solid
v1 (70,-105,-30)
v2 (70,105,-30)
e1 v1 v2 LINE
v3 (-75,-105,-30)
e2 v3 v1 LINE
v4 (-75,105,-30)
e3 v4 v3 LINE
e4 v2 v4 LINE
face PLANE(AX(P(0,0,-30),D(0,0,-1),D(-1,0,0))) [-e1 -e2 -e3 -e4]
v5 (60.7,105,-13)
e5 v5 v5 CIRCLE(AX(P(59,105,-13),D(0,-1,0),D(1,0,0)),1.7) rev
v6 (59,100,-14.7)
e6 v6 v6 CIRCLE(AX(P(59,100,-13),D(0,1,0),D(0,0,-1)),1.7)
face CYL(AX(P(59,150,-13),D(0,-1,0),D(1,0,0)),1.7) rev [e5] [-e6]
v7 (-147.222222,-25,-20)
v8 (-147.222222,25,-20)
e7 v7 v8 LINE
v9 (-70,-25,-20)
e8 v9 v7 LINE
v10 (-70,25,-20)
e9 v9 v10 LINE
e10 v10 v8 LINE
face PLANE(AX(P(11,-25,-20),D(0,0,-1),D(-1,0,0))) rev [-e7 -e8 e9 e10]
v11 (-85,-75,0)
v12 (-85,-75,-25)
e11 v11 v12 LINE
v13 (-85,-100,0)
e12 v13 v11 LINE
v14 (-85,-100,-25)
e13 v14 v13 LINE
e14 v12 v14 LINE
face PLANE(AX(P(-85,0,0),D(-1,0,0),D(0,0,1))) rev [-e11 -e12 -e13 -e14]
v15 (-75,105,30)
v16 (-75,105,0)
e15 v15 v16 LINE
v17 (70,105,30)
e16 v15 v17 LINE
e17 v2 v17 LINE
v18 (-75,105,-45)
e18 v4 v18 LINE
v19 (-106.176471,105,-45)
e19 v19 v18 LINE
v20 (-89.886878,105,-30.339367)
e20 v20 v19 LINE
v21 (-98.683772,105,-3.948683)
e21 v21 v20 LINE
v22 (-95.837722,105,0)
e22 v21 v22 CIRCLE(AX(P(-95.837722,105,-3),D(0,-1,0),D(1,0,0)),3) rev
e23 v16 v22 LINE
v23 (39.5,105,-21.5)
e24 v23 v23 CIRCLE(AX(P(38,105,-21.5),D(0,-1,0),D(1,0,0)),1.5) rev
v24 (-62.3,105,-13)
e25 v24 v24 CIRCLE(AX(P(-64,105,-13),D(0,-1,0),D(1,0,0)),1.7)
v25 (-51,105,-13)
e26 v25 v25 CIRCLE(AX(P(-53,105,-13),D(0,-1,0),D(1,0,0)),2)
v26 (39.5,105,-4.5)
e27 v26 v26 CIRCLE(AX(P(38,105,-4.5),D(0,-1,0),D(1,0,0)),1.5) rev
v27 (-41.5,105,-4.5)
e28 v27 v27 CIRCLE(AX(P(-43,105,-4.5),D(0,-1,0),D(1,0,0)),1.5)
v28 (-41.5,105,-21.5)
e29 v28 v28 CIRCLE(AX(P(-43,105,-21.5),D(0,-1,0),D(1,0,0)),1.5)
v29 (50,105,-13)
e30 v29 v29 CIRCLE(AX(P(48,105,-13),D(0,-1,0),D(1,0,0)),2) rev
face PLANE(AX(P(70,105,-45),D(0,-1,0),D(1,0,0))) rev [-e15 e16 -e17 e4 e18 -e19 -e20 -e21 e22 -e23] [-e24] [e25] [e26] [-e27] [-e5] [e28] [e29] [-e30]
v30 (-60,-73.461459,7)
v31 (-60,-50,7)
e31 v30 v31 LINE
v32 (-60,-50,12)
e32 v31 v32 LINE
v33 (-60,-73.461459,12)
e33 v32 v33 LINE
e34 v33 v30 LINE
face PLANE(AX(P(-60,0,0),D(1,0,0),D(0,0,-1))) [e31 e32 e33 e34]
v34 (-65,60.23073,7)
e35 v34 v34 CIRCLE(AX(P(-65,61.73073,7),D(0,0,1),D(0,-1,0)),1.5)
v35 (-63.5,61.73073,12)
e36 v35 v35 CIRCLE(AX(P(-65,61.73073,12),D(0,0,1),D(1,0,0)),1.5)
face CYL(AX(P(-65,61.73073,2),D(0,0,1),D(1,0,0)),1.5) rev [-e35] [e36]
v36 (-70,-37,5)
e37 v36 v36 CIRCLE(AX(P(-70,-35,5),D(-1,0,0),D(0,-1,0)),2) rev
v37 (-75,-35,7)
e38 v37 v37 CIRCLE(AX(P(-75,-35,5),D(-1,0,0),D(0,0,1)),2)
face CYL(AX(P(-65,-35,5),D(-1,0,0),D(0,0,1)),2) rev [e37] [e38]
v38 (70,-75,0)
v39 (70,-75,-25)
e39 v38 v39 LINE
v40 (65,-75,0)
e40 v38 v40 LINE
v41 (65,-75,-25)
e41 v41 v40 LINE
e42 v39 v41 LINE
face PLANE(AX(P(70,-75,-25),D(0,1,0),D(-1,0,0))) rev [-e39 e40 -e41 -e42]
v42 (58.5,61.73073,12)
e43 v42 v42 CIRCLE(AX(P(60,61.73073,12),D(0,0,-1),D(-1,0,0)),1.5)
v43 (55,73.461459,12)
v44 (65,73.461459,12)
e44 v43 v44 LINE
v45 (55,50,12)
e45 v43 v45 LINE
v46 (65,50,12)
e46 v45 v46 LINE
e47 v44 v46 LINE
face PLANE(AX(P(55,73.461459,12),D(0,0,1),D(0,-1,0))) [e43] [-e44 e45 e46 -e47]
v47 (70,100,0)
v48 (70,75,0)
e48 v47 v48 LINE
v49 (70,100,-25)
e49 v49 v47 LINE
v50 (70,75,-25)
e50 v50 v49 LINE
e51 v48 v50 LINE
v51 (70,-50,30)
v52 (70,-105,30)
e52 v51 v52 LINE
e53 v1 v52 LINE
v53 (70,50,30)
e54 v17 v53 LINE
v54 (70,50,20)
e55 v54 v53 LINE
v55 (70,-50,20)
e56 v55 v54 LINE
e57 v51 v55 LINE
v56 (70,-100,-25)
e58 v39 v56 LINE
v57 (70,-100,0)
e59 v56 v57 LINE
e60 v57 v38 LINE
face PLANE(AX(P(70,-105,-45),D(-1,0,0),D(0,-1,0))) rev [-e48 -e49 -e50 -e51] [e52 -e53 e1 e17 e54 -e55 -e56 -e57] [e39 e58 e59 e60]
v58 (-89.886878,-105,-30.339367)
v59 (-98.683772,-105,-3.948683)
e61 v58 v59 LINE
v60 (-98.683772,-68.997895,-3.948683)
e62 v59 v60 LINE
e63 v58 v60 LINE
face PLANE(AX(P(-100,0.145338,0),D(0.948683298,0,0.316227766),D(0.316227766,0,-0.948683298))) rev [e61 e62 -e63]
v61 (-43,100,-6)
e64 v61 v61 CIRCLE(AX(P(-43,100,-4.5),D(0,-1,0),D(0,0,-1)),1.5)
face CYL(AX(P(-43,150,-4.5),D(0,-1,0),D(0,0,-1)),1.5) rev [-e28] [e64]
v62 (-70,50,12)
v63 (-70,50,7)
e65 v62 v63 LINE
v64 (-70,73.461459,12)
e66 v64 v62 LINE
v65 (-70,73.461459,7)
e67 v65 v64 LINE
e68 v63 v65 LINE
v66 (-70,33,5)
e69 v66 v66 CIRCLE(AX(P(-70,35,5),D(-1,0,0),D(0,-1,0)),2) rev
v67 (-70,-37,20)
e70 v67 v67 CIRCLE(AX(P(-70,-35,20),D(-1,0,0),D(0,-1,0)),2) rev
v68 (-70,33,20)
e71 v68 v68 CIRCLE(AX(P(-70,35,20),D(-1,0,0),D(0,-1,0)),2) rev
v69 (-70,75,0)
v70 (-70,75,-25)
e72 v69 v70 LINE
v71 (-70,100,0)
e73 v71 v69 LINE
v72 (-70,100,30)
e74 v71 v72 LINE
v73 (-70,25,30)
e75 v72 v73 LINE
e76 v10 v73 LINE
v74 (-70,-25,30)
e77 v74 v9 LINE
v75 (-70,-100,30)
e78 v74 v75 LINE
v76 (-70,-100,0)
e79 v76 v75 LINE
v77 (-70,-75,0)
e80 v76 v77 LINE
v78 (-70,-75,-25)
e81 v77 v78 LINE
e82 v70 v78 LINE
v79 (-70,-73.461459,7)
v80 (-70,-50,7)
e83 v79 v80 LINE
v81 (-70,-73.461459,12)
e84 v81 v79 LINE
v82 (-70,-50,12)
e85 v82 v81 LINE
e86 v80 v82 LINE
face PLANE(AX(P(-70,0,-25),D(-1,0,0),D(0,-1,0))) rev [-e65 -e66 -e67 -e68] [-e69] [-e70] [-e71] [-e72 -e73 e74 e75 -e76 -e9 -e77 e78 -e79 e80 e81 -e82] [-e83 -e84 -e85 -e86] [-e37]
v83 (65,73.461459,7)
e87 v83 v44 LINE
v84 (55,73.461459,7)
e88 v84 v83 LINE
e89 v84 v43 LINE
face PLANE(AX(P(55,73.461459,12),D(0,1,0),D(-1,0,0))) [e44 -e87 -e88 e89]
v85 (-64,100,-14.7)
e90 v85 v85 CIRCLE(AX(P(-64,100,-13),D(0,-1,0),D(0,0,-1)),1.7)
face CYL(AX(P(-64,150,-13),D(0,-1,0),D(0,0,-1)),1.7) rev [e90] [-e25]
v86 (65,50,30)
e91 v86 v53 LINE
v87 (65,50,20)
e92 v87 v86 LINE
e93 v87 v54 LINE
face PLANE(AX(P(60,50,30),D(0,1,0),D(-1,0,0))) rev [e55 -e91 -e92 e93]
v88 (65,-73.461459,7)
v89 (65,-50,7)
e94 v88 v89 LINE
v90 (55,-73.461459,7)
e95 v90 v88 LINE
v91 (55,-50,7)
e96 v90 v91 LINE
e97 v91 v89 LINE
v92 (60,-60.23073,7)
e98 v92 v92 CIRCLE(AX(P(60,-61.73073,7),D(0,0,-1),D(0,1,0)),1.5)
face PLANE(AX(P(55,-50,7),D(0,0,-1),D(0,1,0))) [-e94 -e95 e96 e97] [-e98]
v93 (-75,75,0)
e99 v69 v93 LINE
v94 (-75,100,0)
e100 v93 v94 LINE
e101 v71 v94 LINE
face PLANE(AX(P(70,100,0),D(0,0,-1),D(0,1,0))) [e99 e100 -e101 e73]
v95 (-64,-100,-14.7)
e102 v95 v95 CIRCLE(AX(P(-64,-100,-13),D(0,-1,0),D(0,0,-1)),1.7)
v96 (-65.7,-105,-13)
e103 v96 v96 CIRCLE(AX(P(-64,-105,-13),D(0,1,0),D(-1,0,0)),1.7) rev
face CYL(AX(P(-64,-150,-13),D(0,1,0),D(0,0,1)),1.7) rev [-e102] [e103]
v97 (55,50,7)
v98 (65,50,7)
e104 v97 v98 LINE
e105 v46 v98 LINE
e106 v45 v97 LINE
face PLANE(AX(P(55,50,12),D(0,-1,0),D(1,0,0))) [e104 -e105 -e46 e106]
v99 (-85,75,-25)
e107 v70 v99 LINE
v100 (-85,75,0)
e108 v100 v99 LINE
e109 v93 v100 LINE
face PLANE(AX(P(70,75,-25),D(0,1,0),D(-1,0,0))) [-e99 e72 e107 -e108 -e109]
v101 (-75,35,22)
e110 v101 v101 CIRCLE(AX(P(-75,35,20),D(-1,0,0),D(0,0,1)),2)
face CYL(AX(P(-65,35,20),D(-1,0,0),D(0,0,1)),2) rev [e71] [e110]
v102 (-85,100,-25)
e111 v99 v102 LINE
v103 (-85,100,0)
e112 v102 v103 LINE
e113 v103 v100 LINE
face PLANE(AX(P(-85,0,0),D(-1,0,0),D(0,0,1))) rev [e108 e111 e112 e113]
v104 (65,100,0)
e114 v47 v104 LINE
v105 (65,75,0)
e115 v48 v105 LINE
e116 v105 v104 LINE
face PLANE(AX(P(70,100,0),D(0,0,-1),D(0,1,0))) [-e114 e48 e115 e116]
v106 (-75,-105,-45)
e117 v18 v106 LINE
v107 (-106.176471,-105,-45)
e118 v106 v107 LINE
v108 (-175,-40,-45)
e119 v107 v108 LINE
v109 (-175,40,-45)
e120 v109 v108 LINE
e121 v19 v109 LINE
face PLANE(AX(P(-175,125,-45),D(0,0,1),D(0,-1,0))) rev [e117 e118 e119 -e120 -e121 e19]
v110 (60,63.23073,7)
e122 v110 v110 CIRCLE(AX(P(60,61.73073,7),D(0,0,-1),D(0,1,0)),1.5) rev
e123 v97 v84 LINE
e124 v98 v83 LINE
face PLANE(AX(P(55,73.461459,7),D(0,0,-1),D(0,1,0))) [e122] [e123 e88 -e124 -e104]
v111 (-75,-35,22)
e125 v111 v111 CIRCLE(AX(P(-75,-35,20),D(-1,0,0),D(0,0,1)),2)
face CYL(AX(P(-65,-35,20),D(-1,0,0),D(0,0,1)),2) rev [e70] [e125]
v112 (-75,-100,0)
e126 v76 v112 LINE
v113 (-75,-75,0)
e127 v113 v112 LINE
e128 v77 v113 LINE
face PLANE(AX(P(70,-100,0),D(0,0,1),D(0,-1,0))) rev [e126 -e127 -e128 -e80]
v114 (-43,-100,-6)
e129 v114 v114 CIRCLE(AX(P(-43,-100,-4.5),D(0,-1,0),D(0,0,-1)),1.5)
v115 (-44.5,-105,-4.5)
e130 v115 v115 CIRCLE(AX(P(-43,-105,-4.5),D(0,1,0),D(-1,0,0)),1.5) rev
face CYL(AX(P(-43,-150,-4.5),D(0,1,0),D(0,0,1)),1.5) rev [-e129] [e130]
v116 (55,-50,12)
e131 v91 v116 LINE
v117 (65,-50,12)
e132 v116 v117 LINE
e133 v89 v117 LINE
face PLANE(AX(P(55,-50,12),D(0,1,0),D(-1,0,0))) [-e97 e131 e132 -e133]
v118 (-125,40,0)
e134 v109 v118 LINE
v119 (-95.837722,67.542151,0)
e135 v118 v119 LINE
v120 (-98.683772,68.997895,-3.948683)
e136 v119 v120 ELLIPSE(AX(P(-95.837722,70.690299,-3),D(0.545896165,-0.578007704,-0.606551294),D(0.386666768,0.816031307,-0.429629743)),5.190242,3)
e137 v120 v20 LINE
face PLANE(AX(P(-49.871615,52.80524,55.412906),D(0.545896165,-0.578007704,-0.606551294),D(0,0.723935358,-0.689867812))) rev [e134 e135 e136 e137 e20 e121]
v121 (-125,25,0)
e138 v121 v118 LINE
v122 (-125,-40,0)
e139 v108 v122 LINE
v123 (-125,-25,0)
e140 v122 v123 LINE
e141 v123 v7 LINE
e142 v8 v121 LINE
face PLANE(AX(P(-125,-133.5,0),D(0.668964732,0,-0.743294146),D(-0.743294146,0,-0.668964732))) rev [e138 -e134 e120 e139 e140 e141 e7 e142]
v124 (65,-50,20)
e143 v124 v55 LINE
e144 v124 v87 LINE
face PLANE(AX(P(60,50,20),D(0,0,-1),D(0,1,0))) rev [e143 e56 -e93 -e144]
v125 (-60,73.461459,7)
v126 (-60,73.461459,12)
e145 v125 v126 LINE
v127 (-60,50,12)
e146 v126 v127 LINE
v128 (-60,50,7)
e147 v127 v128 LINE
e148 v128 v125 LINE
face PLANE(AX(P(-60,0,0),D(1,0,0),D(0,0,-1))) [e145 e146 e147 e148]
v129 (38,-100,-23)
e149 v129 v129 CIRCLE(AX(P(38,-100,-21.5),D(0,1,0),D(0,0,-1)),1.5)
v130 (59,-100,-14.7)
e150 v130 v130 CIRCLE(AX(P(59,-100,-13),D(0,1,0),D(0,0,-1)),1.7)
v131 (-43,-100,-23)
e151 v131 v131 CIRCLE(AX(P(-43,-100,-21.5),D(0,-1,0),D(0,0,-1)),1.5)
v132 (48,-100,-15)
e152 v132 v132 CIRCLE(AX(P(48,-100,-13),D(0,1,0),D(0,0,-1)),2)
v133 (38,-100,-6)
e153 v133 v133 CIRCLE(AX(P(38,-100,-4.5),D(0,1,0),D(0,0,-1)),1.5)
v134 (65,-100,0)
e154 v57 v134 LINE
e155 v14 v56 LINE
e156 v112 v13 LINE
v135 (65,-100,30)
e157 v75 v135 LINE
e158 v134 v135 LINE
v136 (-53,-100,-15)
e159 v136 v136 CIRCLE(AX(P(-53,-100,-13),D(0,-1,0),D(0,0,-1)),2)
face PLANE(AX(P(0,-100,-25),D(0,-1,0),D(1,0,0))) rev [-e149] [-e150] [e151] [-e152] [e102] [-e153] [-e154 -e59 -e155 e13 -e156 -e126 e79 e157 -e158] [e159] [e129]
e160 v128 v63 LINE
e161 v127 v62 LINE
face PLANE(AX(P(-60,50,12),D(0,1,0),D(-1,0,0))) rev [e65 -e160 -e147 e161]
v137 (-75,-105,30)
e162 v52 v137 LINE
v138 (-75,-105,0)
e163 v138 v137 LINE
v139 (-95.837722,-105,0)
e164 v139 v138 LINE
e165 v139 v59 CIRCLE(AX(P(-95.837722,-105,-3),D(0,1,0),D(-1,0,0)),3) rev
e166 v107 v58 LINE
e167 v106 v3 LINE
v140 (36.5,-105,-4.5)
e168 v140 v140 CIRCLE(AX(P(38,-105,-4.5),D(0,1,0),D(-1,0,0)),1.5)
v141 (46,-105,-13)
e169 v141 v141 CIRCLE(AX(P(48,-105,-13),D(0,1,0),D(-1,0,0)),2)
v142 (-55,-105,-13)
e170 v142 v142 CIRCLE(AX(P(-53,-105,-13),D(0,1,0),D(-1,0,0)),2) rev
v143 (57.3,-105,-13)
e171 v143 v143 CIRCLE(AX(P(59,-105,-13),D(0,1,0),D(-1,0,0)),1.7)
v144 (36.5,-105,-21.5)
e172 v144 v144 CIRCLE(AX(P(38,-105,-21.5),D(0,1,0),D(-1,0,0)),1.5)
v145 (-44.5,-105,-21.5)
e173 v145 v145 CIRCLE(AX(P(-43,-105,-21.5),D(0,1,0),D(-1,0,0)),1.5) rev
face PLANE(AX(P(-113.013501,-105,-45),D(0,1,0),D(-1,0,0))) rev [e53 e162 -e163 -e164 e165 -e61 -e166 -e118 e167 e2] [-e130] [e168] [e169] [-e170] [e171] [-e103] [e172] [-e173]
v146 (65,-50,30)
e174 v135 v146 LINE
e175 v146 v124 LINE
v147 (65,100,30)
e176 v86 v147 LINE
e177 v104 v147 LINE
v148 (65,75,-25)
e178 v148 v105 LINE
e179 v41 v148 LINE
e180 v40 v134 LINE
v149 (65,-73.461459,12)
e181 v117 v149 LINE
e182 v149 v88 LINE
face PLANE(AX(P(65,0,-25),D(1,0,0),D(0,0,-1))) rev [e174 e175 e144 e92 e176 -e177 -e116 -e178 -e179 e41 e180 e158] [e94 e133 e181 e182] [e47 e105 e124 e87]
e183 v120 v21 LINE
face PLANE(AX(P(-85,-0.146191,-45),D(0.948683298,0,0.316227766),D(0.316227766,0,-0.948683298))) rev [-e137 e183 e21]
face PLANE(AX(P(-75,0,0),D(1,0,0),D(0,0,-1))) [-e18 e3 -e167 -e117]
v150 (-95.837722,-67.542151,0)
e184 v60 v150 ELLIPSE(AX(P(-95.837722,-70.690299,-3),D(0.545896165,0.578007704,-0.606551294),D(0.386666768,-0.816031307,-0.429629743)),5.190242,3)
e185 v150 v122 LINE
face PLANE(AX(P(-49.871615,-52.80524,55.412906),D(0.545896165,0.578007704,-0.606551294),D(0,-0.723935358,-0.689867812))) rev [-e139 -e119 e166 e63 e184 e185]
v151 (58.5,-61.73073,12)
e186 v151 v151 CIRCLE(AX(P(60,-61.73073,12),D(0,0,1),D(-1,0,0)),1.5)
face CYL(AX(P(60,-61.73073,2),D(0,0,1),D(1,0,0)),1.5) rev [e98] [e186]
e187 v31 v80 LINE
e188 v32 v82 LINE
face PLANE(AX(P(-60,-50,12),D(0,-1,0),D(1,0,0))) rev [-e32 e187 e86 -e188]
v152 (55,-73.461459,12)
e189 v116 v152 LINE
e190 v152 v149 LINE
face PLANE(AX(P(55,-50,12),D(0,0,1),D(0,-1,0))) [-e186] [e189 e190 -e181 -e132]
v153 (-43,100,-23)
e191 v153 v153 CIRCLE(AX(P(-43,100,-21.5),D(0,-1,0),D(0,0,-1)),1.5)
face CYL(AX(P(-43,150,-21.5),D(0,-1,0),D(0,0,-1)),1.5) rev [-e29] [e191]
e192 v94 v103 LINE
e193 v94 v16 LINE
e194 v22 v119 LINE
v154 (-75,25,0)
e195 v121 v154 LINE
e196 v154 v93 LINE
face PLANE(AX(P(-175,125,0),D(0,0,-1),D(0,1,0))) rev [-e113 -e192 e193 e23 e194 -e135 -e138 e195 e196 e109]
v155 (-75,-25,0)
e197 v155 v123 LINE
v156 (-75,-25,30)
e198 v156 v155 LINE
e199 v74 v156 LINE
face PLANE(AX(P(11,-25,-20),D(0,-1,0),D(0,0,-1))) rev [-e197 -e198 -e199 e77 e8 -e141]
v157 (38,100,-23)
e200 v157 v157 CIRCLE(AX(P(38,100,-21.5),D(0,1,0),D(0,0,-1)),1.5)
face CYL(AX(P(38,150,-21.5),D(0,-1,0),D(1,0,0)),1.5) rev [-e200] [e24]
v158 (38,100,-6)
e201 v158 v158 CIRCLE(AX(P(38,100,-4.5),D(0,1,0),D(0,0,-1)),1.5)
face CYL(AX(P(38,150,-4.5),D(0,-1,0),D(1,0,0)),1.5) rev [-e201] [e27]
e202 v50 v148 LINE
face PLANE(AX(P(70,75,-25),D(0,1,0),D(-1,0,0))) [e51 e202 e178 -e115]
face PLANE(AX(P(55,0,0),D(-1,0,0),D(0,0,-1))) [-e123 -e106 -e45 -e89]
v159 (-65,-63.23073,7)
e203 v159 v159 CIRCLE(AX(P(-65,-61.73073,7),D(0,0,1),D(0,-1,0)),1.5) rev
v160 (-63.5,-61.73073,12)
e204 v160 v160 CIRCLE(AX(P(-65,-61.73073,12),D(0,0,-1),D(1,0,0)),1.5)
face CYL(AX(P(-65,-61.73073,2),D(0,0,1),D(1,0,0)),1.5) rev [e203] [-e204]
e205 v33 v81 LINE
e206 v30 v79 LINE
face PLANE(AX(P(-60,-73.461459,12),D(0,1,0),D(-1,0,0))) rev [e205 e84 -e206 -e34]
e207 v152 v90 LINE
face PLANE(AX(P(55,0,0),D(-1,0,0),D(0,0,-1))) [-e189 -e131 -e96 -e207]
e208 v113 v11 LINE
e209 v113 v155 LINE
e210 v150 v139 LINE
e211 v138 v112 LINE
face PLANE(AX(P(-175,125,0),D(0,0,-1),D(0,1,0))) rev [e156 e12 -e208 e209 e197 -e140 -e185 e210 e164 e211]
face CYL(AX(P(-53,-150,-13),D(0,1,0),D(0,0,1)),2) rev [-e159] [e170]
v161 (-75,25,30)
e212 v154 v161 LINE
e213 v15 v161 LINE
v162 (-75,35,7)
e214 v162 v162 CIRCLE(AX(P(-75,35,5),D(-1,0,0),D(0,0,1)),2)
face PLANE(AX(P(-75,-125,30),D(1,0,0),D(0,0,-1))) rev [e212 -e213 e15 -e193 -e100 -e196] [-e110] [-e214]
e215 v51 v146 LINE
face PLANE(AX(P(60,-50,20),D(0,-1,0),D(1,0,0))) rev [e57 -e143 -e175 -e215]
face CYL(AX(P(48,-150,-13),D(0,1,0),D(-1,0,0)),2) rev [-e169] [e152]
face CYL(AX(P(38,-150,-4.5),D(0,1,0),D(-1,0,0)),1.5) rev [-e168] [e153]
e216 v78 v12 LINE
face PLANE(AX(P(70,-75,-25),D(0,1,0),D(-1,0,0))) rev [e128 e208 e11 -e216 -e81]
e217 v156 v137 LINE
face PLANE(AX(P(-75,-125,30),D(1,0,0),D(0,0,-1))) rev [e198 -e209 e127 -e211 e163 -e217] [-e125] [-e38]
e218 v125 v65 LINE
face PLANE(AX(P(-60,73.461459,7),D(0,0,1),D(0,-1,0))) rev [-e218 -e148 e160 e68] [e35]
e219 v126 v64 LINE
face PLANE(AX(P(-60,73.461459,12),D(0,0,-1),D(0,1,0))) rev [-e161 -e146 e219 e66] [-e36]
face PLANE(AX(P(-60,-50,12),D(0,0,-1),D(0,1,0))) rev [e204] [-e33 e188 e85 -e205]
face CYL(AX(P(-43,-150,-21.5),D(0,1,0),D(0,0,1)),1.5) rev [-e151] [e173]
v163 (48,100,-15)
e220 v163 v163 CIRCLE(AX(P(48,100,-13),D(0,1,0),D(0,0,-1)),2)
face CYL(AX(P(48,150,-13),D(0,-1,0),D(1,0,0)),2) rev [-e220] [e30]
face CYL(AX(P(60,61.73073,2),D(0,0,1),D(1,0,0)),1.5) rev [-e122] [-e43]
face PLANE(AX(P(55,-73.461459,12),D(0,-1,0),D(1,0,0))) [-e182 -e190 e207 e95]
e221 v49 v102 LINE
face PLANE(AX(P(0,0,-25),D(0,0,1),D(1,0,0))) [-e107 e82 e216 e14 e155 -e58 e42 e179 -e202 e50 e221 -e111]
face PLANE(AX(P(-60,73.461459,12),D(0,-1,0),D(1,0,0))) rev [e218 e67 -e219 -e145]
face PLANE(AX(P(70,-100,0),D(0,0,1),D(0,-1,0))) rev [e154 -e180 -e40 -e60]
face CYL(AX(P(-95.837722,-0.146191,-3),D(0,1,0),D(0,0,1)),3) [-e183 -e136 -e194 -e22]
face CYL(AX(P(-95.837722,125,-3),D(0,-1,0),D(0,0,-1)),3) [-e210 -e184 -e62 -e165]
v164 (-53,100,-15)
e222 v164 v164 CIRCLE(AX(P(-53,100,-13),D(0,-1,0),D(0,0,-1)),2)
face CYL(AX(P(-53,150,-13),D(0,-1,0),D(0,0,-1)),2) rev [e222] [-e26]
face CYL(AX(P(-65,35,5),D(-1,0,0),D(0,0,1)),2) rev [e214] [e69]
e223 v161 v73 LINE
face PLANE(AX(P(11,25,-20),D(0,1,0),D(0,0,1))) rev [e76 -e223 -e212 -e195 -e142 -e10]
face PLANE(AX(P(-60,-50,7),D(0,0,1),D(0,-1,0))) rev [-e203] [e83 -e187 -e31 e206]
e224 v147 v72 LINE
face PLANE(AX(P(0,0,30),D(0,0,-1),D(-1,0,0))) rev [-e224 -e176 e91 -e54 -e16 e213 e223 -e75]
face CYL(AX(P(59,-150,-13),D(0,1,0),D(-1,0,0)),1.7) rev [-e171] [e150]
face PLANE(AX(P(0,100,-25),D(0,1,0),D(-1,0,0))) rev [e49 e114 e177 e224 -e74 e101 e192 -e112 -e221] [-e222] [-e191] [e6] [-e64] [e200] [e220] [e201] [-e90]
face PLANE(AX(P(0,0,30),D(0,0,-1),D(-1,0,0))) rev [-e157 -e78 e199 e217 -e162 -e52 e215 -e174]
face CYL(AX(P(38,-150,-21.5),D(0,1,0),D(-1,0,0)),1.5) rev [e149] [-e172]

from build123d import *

# Parameters (mm, degrees)
SKETCH1_W                 = 150
SKETCH1_H                 = 250
BOSS_EXTRUDE1_DEPTH       = 30
SKETCH6_W                 = 45
SKETCH6_H                 = 250
BOSS_EXTRUDE3_DEPTH       = 100
CUT_EXTRUDE7_DEPTH        = 133.5
CUT_EXTRUDE10_DEPTH       = 267
CUT_EXTRUDE11_START       = -50
CUT_EXTRUDE11_DEPTH       = 50
CUT_EXTRUDE16_START       = 7.483352464
CUT_EXTRUDE16_DEPTH       = 123.332093593
CUT_EXTRUDE17_REACH       = 310.464
SKETCH18_R                = 2
CUT_EXTRUDE18_DEPTH       = 10
CUT_EXTRUDE19_START       = 110
SKETCH17_W                = 110
SKETCH17_H                = 50
CUT_EXTRUDE19_DEPTH       = 196
FILLET3_R                 = 3
FILLET5_R                 = 3
CUT_EXTRUDE20_DEPTH       = 228.760839479
SKETCH20_W                = 135
SKETCH20_H                = 200
CUT_EXTRUDE21_DEPTH       = 55
SKETCH22_R                = 1.7
SKETCH22_R_2              = 2
SKETCH22_R_3              = 1.5
CUT_EXTRUDE22_DEPTH       = 50
MIRROR4_COPY_1_SKETCH_R   = 1.7
MIRROR4_COPY_1_SKETCH_R_2 = 2
MIRROR4_COPY_1_SKETCH_R_3 = 1.5
MIRROR4_COPY_1_DEPTH      = 50
CUT_EXTRUDE23_START       = -15
SKETCH23_W                = 25
SKETCH23_H                = 25
CUT_EXTRUDE23_DEPTH       = 196.693109996
SKETCH24_W                = 10
SKETCH24_H                = 100
CUT_EXTRUDE24_DEPTH       = 10
SKETCH26_W                = 5
SKETCH26_H                = 23.461459367
BOSS_EXTRUDE4_DEPTH       = 10
SKETCH28_R                = 1.5
CUT_EXTRUDE25_DEPTH       = 10
MIRROR8_COPY_1_SKETCH_R   = 1.5
MIRROR8_COPY_1_DEPTH      = 10


with BuildPart() as part:
    # Sketch1 → Boss-Extrude1 (new, symmetric)
    with BuildSketch(Plane.XY):
        Rectangle(SKETCH1_W, SKETCH1_H)
    extrude(amount=BOSS_EXTRUDE1_DEPTH, both=True)

    # Sketch6 → Boss-Extrude3 (add)
    with BuildSketch(Plane.ZY.offset(75)):
        with Locations((-22.5, 0)):
            Rectangle(SKETCH6_W, SKETCH6_H)
    extrude(amount=BOSS_EXTRUDE3_DEPTH)

    # Sketch9 → Cut-Extrude7 (cut, symmetric)
    with BuildSketch(Plane(origin=(0, 0, 0), x_dir=(1, 0, 0), z_dir=(0, 1, 0))):
        Polygon((-125, 0), (-175, 45), (-175, 0), align=None)
    extrude(amount=CUT_EXTRUDE7_DEPTH, both=True, mode=Mode.SUBTRACT)

    # Sketch13 → Cut-Extrude10 (cut)
    with BuildSketch(Plane(origin=(-49.871615343, 52.805239774, 55.412905936), x_dir=(-0.837852837655121, -0.3765961924075118, -0.3951935352424505), z_dir=(0.5458961645159833, -0.578007703605159, -0.6065512939066482))):
        Polygon((138.497571597, 161.006204915), (149.344107979, 60.001465841), (41.926676236, 121.535971264), align=None)
    cut_extrude10 = extrude(amount=-CUT_EXTRUDE10_DEPTH, mode=Mode.SUBTRACT)

    # Cut-Extrude11: read off the stored shape, not the designer's step
    # Cut-Extrude11 outline → Cut-Extrude11 (cut)
    with BuildSketch(Plane(origin=(-49.871615343, 52.805239774, 55.412905936), x_dir=(-0.837852837655121, -0.3765961924075118, -0.3951935352424505), z_dir=(0.5458961645159833, -0.578007703605159, -0.6065512939066482)).offset(CUT_EXTRUDE11_START)):
        Polygon((149.344107979, 60.001465841), (41.926676236, 121.535971264), (89.667757011, 28.957414317), align=None)
    cut_extrude11 = extrude(amount=CUT_EXTRUDE11_DEPTH, mode=Mode.SUBTRACT)

    # Cut-Extrude16: read off the stored shape, not the designer's step
    # Cut-Extrude16 outline → Cut-Extrude16 (cut)
    with BuildSketch(Plane(origin=(0, 0, 0), x_dir=(0.98112989145127, -0.1559406555847297, 0.11430943984039024), z_dir=(0.19334977657297428, 0.7913018633819886, -0.5800493297189246)).offset(CUT_EXTRUDE16_START)):
        Polygon((-117.605571093, -73.90068007), (-108.032547514, -37.607234969), (-131.340301245, -22), (-144, -22), (-144, -75), (-117.895535729, -75), align=None)
    extrude(amount=CUT_EXTRUDE16_DEPTH, mode=Mode.SUBTRACT)

    # Mirror2: Cut-Extrude10, Cut-Extrude11 across plane
    add(cut_extrude10.mirror(Plane.ZX), mode=Mode.SUBTRACT)
    add(cut_extrude11.mirror(Plane.ZX), mode=Mode.SUBTRACT)

    # Cut-Extrude17: up to this face of the body (flat: up to its plane)
    cut_extrude17_end = Plane(part.part.faces().sort_by_distance((-128.333333334, -68.333333333, -30))[0])
    # Sketch15 → Cut-Extrude17 (cut, up to the picked face)
    with BuildSketch(Plane.XZ.offset(125), mode=Mode.PRIVATE) as cut_extrude17_sk1:
        Polygon((-125.332336707, 0), (-100, 0), (-85, -45), align=None)
    cut_extrude17_tool1 = split(extrude(cut_extrude17_sk1.sketch, amount=-CUT_EXTRUDE17_REACH, mode=Mode.PRIVATE), bisect_by=cut_extrude17_end, keep=Keep.BOTH, mode=Mode.PRIVATE)
    add(cut_extrude17_tool1.solids().sort_by(Axis((-103.444112, -125, -15), (0, 1, 0)))[0], mode=Mode.SUBTRACT)

    # Sketch18 → Cut-Extrude18 (cut)
    with BuildSketch(Plane.ZY.offset(75)):
        with Locations((5, -35)):
            Circle(SKETCH18_R)
        with Locations((20, -35)):
            Circle(SKETCH18_R)
        with Locations((5, 35)):
            Circle(SKETCH18_R)
        with Locations((20, 35)):
            Circle(SKETCH18_R)
    extrude(amount=-CUT_EXTRUDE18_DEPTH, mode=Mode.SUBTRACT)

    # Sketch17 → Cut-Extrude19 (cut)
    with BuildSketch(Plane.ZY.offset(75).offset(CUT_EXTRUDE19_START)):
        with Locations((35, 0)):
            Rectangle(SKETCH17_W, SKETCH17_H)
    extrude(amount=-CUT_EXTRUDE19_DEPTH, mode=Mode.SUBTRACT)

    # Fillet3
    # the kernel refuses this fillet: 3 mm, written as the material it takes off along each edge
    with BuildSketch(Plane(origin=(-95.83772234, -122, -3), x_dir=(-0.9486832980505141, 0, -0.3162277660168372), z_dir=(0, -1, 0))) as fillet3_piece_1_section:
        Polygon((0, 0), (FILLET3_R * 1.02, 0), (FILLET3_R * 1.02, -FILLET3_R * 1.41517440446), (-FILLET3_R * 0.322552321337, -FILLET3_R * 0.967656964012), align=None)
    fillet3_piece_1 = extrude(amount=FILLET3_R * 1.02, mode=Mode.PRIVATE)
    fillet3_piece_1 = fillet3_piece_1 - Plane(origin=(-95.83772234, -122, -3), x_dir=(0.8112421851755607, 0, -0.5847102846637652), z_dir=(0, -1, 0)) * Sphere(FILLET3_R, mode=Mode.PRIVATE)
    add(fillet3_piece_1, mode=Mode.SUBTRACT)
    with BuildSketch(Plane(origin=(-75, -125, 0), x_dir=(0, 0, -1), z_dir=(-1, 0, 0))) as fillet3_piece_2:
        with BuildLine():
            CenterArc((FILLET3_R, -FILLET3_R), FILLET3_R, 90, 90)
            Line((0, -FILLET3_R), (0, 0))
            Line((0, 0), (FILLET3_R, 0))
        make_face()
    extrude(amount=20.83772234, mode=Mode.SUBTRACT)
    with BuildSketch(Plane(origin=(-98.683772234, -125, -3.948683298), x_dir=(0.9486832980505141, 0, 0.3162277660168373), z_dir=(0.3162277660168372, 0, -0.9486832980505141))) as fillet3_piece_3_section:
        with BuildLine():
            CenterArc((FILLET3_R, -FILLET3_R), FILLET3_R, 90, 90)
            Line((0, -FILLET3_R), (0, 0))
            Line((0, 0), (FILLET3_R, 0))
        make_face()
    fillet3_piece_3 = extrude(amount=50.771887242, mode=Mode.PRIVATE)
    fillet3_piece_3 = split(fillet3_piece_3, bisect_by=Plane(origin=(-81.013305522, -106.290094069, -23.5825352), z_dir=(-0.5458961645159834, -0.5780077036051591, 0.6065512939066484)), keep=Keep.TOP, mode=Mode.PRIVATE)
    add(fillet3_piece_3, mode=Mode.SUBTRACT)
    with BuildSketch(Plane(origin=(-100, -122, 0), x_dir=(0.3162277660168381, 0, -0.9486832980505137), z_dir=(0, 1, 0))) as fillet3_piece_4_section:
        with BuildLine():
            CenterArc((FILLET3_R * 1.38742588672, -FILLET3_R), FILLET3_R, 90, 108.434948823)
            Line((FILLET3_R * 0.438742588672, -FILLET3_R * 1.31622776602), (0, 0))
            Line((0, 0), (FILLET3_R * 1.38742588672, 0))
        make_face()
    fillet3_piece_4 = extrude(amount=68.794583039, mode=Mode.PRIVATE)
    fillet3_piece_4 = split(fillet3_piece_4, bisect_by=Plane(origin=(-81.576426107, -102.492686466, -20.470637659), z_dir=(-0.5458961645159834, -0.5780077036051591, 0.6065512939066484)), keep=Keep.TOP, mode=Mode.PRIVATE)
    add(fillet3_piece_4, mode=Mode.SUBTRACT)

    # Fillet5
    # the kernel refuses this fillet: 3 mm, written as the material it takes off along each edge
    with BuildSketch(Plane(origin=(-95.83772234, 122, -3), x_dir=(-0.9486832980504565, -1.410260797030105e-13, -0.31622776601701025), z_dir=(0, 1, 0))) as fillet5_piece_1_section:
        Polygon((0, 0), (FILLET5_R * 1.02, 0), (FILLET5_R * 1.02, FILLET5_R * 1.41517440446), (-FILLET5_R * 0.322552321337, FILLET5_R * 0.967656964011), align=None)
    fillet5_piece_1 = extrude(amount=FILLET5_R * 1.02, mode=Mode.PRIVATE)
    fillet5_piece_1 = fillet5_piece_1 - Plane(origin=(-95.83772234, 122, -3), x_dir=(0.8112421851756141, 1.2049011170048047e-13, -0.5847102846636912), z_dir=(0, 1, 0)) * Sphere(FILLET5_R, mode=Mode.PRIVATE)
    add(fillet5_piece_1, mode=Mode.SUBTRACT)
    with BuildSketch(Plane(origin=(-75, 125, 0), x_dir=(0, 0, -1), z_dir=(-1, 0, 0))) as fillet5_piece_2:
        with BuildLine():
            CenterArc((FILLET5_R, FILLET5_R), FILLET5_R, 180, 90)
            Line((0, FILLET5_R), (0, 0))
            Line((0, 0), (FILLET5_R, 0))
        make_face()
    extrude(amount=20.83772234, mode=Mode.SUBTRACT)
    with BuildSketch(Plane(origin=(-82.628291755, 125, -52.115124735), x_dir=(0.9486832980504564, 0, 0.31622776601701025), z_dir=(-0.31622776601701025, 0, 0.9486832980504565))) as fillet5_piece_3_section:
        with BuildLine():
            CenterArc((FILLET5_R, -FILLET5_R), FILLET5_R, 90, 90)
            Line((0, -FILLET5_R), (0, 0))
            Line((0, 0), (FILLET5_R, 0))
        make_face()
    fillet5_piece_3 = extrude(amount=50.771887242, mode=Mode.PRIVATE)
    fillet5_piece_3 = split(fillet5_piece_3, bisect_by=Plane(origin=(-85.69098462, 128.24285127, -48.712132662), z_dir=(-0.5458961645131595, 0.5780077036058499, 0.6065512939085316)), keep=Keep.TOP, mode=Mode.PRIVATE)
    add(fillet5_piece_3, mode=Mode.SUBTRACT)
    with BuildSketch(Plane(origin=(-100, 53.205416961, 0), x_dir=(0.31622776601701785, 4.687960412721508e-14, -0.9486832980504537), z_dir=(0, 1, 0))) as fillet5_piece_4_section:
        with BuildLine():
            CenterArc((FILLET5_R * 1.38742588672, -FILLET5_R), FILLET5_R, 90, 108.434948823)
            Line((FILLET5_R * 0.438742588673, -FILLET5_R * 1.31622776602), (0, 0))
            Line((0, 0), (FILLET5_R * 1.38742588672, 0))
        make_face()
    fillet5_piece_4 = extrude(amount=68.794583039, mode=Mode.PRIVATE)
    fillet5_piece_4 = split(fillet5_piece_4, bisect_by=Plane(origin=(-103.283331447, 56.681885553, 3.648146053), z_dir=(-0.5458961645131595, 0.5780077036058499, 0.6065512939085316)), keep=Keep.TOP, mode=Mode.PRIVATE)
    add(fillet5_piece_4, mode=Mode.SUBTRACT)

    # Sketch19 → Cut-Extrude20 (cut, through all)
    with BuildSketch(Plane.XY.offset(30)):
        Polygon((-113.013501494, -125), (75, -125), (75, 125), (-115.323741981, 125), (-115.323741981, 105), (70, 105), (70, -105), (-113.013501494, -105), align=None)
    extrude(amount=-CUT_EXTRUDE20_DEPTH, mode=Mode.SUBTRACT)

    # Sketch20 → Cut-Extrude21 (cut)
    with BuildSketch(Plane.XY.offset(30)):
        with Locations((-2.5, 0)):
            Rectangle(SKETCH20_W, SKETCH20_H)
    extrude(amount=-CUT_EXTRUDE21_DEPTH, mode=Mode.SUBTRACT)

    # Sketch22 → Cut-Extrude22 (cut)
    with BuildSketch(Plane.XZ.offset(-100)):
        with Locations(Location((-64, -13, 0), (0, 0, 270))):
            Circle(SKETCH22_R)
        with Locations(Location((-53, -13, 0), (0, 0, 270))):
            Circle(SKETCH22_R_2)
        with Locations(Location((-43, -4.5, 0), (0, 0, 270))):
            Circle(SKETCH22_R_3)
        with Locations(Location((-43, -21.5, 0), (0, 0, 270))):
            Circle(SKETCH22_R_3)
    cut_extrude22 = extrude(amount=-CUT_EXTRUDE22_DEPTH, mode=Mode.SUBTRACT)

    # Mirror3: Cut-Extrude22 across plane
    add(cut_extrude22.mirror(Plane(origin=(-2.5, 0, 0), x_dir=(0, 0, 1), z_dir=(1, 0, 0))), mode=Mode.SUBTRACT)

    # Mirror4: Cut-Extrude22 across plane
    add(cut_extrude22.mirror(Plane.ZX), mode=Mode.SUBTRACT)

    # Mirror4 copy 1 sketch → Mirror4 copy 1 (cut)
    with BuildSketch(Plane(origin=(-5, -100, 0), x_dir=(-1, 0, 0), z_dir=(0, 1, 0))):
        with Locations(Location((-64, -13, 0), (0, 0, 270))):
            Circle(MIRROR4_COPY_1_SKETCH_R)
        with Locations(Location((-53, -13, 0), (0, 0, 270))):
            Circle(MIRROR4_COPY_1_SKETCH_R_2)
        with Locations(Location((-43, -4.5, 0), (0, 0, 270))):
            Circle(MIRROR4_COPY_1_SKETCH_R_3)
        with Locations(Location((-43, -21.5, 0), (0, 0, 270))):
            Circle(MIRROR4_COPY_1_SKETCH_R_3)
    extrude(amount=-MIRROR4_COPY_1_DEPTH, mode=Mode.SUBTRACT)

    # Sketch23 → Cut-Extrude23 (cut)
    with BuildSketch(Plane(origin=(-70, 0, 0), x_dir=(0, 0, -1), z_dir=(1, 0, 0)).offset(CUT_EXTRUDE23_START)):
        with Locations((12.5, 87.5)):
            Rectangle(SKETCH23_W, SKETCH23_H)
    cut_extrude23 = extrude(amount=CUT_EXTRUDE23_DEPTH, mode=Mode.SUBTRACT)

    # Mirror5: Cut-Extrude23 across plane
    add(cut_extrude23.mirror(Plane.ZX), mode=Mode.SUBTRACT)

    # Sketch24 → Cut-Extrude24 (cut)
    with BuildSketch(Plane(origin=(70, 0, 0), x_dir=(0, 0, -1), z_dir=(1, 0, 0))):
        with Locations((-25, 0)):
            Rectangle(SKETCH24_W, SKETCH24_H)
    extrude(amount=-CUT_EXTRUDE24_DEPTH, mode=Mode.SUBTRACT)

    # Sketch26 → Boss-Extrude4 (add)
    with BuildSketch(Plane(origin=(-70, 0, 0), x_dir=(0, 0, -1), z_dir=(1, 0, 0))):
        with Locations((-9.5, 61.730729684)):
            Rectangle(SKETCH26_W, SKETCH26_H)
        with Locations((-9.5, -61.730729684)):
            Rectangle(SKETCH26_W, SKETCH26_H)
    boss_extrude4 = extrude(amount=BOSS_EXTRUDE4_DEPTH)

    # Mirror6: Boss-Extrude4 across plane
    add(boss_extrude4.mirror(Plane(origin=(-2.5, 0, 0), x_dir=(0, 0, 1), z_dir=(1, 0, 0))))

    # Sketch28 → Cut-Extrude25 (cut)
    with BuildSketch(Plane.XY.offset(12)):
        with Locations((-65, 61.730729684)):
            Circle(SKETCH28_R)
    cut_extrude25 = extrude(amount=-CUT_EXTRUDE25_DEPTH, mode=Mode.SUBTRACT)

    # Mirror7: Cut-Extrude25 across plane
    add(cut_extrude25.mirror(Plane.ZX), mode=Mode.SUBTRACT)

    # Mirror8: Cut-Extrude25 across plane
    add(cut_extrude25.mirror(Plane(origin=(-2.5, 0, 0), x_dir=(0, 0, 1), z_dir=(1, 0, 0))), mode=Mode.SUBTRACT)

    # Mirror8 copy 1 sketch → Mirror8 copy 1 (cut)
    with BuildSketch(Plane(origin=(-5, 0, 12), x_dir=(-1, 0, 0), z_dir=(0, 0, 1))):
        with Locations((-65, 61.730729684)):
            Circle(MIRROR8_COPY_1_SKETCH_R)
    extrude(amount=-MIRROR8_COPY_1_DEPTH, mode=Mode.SUBTRACT)


solid = part.part
